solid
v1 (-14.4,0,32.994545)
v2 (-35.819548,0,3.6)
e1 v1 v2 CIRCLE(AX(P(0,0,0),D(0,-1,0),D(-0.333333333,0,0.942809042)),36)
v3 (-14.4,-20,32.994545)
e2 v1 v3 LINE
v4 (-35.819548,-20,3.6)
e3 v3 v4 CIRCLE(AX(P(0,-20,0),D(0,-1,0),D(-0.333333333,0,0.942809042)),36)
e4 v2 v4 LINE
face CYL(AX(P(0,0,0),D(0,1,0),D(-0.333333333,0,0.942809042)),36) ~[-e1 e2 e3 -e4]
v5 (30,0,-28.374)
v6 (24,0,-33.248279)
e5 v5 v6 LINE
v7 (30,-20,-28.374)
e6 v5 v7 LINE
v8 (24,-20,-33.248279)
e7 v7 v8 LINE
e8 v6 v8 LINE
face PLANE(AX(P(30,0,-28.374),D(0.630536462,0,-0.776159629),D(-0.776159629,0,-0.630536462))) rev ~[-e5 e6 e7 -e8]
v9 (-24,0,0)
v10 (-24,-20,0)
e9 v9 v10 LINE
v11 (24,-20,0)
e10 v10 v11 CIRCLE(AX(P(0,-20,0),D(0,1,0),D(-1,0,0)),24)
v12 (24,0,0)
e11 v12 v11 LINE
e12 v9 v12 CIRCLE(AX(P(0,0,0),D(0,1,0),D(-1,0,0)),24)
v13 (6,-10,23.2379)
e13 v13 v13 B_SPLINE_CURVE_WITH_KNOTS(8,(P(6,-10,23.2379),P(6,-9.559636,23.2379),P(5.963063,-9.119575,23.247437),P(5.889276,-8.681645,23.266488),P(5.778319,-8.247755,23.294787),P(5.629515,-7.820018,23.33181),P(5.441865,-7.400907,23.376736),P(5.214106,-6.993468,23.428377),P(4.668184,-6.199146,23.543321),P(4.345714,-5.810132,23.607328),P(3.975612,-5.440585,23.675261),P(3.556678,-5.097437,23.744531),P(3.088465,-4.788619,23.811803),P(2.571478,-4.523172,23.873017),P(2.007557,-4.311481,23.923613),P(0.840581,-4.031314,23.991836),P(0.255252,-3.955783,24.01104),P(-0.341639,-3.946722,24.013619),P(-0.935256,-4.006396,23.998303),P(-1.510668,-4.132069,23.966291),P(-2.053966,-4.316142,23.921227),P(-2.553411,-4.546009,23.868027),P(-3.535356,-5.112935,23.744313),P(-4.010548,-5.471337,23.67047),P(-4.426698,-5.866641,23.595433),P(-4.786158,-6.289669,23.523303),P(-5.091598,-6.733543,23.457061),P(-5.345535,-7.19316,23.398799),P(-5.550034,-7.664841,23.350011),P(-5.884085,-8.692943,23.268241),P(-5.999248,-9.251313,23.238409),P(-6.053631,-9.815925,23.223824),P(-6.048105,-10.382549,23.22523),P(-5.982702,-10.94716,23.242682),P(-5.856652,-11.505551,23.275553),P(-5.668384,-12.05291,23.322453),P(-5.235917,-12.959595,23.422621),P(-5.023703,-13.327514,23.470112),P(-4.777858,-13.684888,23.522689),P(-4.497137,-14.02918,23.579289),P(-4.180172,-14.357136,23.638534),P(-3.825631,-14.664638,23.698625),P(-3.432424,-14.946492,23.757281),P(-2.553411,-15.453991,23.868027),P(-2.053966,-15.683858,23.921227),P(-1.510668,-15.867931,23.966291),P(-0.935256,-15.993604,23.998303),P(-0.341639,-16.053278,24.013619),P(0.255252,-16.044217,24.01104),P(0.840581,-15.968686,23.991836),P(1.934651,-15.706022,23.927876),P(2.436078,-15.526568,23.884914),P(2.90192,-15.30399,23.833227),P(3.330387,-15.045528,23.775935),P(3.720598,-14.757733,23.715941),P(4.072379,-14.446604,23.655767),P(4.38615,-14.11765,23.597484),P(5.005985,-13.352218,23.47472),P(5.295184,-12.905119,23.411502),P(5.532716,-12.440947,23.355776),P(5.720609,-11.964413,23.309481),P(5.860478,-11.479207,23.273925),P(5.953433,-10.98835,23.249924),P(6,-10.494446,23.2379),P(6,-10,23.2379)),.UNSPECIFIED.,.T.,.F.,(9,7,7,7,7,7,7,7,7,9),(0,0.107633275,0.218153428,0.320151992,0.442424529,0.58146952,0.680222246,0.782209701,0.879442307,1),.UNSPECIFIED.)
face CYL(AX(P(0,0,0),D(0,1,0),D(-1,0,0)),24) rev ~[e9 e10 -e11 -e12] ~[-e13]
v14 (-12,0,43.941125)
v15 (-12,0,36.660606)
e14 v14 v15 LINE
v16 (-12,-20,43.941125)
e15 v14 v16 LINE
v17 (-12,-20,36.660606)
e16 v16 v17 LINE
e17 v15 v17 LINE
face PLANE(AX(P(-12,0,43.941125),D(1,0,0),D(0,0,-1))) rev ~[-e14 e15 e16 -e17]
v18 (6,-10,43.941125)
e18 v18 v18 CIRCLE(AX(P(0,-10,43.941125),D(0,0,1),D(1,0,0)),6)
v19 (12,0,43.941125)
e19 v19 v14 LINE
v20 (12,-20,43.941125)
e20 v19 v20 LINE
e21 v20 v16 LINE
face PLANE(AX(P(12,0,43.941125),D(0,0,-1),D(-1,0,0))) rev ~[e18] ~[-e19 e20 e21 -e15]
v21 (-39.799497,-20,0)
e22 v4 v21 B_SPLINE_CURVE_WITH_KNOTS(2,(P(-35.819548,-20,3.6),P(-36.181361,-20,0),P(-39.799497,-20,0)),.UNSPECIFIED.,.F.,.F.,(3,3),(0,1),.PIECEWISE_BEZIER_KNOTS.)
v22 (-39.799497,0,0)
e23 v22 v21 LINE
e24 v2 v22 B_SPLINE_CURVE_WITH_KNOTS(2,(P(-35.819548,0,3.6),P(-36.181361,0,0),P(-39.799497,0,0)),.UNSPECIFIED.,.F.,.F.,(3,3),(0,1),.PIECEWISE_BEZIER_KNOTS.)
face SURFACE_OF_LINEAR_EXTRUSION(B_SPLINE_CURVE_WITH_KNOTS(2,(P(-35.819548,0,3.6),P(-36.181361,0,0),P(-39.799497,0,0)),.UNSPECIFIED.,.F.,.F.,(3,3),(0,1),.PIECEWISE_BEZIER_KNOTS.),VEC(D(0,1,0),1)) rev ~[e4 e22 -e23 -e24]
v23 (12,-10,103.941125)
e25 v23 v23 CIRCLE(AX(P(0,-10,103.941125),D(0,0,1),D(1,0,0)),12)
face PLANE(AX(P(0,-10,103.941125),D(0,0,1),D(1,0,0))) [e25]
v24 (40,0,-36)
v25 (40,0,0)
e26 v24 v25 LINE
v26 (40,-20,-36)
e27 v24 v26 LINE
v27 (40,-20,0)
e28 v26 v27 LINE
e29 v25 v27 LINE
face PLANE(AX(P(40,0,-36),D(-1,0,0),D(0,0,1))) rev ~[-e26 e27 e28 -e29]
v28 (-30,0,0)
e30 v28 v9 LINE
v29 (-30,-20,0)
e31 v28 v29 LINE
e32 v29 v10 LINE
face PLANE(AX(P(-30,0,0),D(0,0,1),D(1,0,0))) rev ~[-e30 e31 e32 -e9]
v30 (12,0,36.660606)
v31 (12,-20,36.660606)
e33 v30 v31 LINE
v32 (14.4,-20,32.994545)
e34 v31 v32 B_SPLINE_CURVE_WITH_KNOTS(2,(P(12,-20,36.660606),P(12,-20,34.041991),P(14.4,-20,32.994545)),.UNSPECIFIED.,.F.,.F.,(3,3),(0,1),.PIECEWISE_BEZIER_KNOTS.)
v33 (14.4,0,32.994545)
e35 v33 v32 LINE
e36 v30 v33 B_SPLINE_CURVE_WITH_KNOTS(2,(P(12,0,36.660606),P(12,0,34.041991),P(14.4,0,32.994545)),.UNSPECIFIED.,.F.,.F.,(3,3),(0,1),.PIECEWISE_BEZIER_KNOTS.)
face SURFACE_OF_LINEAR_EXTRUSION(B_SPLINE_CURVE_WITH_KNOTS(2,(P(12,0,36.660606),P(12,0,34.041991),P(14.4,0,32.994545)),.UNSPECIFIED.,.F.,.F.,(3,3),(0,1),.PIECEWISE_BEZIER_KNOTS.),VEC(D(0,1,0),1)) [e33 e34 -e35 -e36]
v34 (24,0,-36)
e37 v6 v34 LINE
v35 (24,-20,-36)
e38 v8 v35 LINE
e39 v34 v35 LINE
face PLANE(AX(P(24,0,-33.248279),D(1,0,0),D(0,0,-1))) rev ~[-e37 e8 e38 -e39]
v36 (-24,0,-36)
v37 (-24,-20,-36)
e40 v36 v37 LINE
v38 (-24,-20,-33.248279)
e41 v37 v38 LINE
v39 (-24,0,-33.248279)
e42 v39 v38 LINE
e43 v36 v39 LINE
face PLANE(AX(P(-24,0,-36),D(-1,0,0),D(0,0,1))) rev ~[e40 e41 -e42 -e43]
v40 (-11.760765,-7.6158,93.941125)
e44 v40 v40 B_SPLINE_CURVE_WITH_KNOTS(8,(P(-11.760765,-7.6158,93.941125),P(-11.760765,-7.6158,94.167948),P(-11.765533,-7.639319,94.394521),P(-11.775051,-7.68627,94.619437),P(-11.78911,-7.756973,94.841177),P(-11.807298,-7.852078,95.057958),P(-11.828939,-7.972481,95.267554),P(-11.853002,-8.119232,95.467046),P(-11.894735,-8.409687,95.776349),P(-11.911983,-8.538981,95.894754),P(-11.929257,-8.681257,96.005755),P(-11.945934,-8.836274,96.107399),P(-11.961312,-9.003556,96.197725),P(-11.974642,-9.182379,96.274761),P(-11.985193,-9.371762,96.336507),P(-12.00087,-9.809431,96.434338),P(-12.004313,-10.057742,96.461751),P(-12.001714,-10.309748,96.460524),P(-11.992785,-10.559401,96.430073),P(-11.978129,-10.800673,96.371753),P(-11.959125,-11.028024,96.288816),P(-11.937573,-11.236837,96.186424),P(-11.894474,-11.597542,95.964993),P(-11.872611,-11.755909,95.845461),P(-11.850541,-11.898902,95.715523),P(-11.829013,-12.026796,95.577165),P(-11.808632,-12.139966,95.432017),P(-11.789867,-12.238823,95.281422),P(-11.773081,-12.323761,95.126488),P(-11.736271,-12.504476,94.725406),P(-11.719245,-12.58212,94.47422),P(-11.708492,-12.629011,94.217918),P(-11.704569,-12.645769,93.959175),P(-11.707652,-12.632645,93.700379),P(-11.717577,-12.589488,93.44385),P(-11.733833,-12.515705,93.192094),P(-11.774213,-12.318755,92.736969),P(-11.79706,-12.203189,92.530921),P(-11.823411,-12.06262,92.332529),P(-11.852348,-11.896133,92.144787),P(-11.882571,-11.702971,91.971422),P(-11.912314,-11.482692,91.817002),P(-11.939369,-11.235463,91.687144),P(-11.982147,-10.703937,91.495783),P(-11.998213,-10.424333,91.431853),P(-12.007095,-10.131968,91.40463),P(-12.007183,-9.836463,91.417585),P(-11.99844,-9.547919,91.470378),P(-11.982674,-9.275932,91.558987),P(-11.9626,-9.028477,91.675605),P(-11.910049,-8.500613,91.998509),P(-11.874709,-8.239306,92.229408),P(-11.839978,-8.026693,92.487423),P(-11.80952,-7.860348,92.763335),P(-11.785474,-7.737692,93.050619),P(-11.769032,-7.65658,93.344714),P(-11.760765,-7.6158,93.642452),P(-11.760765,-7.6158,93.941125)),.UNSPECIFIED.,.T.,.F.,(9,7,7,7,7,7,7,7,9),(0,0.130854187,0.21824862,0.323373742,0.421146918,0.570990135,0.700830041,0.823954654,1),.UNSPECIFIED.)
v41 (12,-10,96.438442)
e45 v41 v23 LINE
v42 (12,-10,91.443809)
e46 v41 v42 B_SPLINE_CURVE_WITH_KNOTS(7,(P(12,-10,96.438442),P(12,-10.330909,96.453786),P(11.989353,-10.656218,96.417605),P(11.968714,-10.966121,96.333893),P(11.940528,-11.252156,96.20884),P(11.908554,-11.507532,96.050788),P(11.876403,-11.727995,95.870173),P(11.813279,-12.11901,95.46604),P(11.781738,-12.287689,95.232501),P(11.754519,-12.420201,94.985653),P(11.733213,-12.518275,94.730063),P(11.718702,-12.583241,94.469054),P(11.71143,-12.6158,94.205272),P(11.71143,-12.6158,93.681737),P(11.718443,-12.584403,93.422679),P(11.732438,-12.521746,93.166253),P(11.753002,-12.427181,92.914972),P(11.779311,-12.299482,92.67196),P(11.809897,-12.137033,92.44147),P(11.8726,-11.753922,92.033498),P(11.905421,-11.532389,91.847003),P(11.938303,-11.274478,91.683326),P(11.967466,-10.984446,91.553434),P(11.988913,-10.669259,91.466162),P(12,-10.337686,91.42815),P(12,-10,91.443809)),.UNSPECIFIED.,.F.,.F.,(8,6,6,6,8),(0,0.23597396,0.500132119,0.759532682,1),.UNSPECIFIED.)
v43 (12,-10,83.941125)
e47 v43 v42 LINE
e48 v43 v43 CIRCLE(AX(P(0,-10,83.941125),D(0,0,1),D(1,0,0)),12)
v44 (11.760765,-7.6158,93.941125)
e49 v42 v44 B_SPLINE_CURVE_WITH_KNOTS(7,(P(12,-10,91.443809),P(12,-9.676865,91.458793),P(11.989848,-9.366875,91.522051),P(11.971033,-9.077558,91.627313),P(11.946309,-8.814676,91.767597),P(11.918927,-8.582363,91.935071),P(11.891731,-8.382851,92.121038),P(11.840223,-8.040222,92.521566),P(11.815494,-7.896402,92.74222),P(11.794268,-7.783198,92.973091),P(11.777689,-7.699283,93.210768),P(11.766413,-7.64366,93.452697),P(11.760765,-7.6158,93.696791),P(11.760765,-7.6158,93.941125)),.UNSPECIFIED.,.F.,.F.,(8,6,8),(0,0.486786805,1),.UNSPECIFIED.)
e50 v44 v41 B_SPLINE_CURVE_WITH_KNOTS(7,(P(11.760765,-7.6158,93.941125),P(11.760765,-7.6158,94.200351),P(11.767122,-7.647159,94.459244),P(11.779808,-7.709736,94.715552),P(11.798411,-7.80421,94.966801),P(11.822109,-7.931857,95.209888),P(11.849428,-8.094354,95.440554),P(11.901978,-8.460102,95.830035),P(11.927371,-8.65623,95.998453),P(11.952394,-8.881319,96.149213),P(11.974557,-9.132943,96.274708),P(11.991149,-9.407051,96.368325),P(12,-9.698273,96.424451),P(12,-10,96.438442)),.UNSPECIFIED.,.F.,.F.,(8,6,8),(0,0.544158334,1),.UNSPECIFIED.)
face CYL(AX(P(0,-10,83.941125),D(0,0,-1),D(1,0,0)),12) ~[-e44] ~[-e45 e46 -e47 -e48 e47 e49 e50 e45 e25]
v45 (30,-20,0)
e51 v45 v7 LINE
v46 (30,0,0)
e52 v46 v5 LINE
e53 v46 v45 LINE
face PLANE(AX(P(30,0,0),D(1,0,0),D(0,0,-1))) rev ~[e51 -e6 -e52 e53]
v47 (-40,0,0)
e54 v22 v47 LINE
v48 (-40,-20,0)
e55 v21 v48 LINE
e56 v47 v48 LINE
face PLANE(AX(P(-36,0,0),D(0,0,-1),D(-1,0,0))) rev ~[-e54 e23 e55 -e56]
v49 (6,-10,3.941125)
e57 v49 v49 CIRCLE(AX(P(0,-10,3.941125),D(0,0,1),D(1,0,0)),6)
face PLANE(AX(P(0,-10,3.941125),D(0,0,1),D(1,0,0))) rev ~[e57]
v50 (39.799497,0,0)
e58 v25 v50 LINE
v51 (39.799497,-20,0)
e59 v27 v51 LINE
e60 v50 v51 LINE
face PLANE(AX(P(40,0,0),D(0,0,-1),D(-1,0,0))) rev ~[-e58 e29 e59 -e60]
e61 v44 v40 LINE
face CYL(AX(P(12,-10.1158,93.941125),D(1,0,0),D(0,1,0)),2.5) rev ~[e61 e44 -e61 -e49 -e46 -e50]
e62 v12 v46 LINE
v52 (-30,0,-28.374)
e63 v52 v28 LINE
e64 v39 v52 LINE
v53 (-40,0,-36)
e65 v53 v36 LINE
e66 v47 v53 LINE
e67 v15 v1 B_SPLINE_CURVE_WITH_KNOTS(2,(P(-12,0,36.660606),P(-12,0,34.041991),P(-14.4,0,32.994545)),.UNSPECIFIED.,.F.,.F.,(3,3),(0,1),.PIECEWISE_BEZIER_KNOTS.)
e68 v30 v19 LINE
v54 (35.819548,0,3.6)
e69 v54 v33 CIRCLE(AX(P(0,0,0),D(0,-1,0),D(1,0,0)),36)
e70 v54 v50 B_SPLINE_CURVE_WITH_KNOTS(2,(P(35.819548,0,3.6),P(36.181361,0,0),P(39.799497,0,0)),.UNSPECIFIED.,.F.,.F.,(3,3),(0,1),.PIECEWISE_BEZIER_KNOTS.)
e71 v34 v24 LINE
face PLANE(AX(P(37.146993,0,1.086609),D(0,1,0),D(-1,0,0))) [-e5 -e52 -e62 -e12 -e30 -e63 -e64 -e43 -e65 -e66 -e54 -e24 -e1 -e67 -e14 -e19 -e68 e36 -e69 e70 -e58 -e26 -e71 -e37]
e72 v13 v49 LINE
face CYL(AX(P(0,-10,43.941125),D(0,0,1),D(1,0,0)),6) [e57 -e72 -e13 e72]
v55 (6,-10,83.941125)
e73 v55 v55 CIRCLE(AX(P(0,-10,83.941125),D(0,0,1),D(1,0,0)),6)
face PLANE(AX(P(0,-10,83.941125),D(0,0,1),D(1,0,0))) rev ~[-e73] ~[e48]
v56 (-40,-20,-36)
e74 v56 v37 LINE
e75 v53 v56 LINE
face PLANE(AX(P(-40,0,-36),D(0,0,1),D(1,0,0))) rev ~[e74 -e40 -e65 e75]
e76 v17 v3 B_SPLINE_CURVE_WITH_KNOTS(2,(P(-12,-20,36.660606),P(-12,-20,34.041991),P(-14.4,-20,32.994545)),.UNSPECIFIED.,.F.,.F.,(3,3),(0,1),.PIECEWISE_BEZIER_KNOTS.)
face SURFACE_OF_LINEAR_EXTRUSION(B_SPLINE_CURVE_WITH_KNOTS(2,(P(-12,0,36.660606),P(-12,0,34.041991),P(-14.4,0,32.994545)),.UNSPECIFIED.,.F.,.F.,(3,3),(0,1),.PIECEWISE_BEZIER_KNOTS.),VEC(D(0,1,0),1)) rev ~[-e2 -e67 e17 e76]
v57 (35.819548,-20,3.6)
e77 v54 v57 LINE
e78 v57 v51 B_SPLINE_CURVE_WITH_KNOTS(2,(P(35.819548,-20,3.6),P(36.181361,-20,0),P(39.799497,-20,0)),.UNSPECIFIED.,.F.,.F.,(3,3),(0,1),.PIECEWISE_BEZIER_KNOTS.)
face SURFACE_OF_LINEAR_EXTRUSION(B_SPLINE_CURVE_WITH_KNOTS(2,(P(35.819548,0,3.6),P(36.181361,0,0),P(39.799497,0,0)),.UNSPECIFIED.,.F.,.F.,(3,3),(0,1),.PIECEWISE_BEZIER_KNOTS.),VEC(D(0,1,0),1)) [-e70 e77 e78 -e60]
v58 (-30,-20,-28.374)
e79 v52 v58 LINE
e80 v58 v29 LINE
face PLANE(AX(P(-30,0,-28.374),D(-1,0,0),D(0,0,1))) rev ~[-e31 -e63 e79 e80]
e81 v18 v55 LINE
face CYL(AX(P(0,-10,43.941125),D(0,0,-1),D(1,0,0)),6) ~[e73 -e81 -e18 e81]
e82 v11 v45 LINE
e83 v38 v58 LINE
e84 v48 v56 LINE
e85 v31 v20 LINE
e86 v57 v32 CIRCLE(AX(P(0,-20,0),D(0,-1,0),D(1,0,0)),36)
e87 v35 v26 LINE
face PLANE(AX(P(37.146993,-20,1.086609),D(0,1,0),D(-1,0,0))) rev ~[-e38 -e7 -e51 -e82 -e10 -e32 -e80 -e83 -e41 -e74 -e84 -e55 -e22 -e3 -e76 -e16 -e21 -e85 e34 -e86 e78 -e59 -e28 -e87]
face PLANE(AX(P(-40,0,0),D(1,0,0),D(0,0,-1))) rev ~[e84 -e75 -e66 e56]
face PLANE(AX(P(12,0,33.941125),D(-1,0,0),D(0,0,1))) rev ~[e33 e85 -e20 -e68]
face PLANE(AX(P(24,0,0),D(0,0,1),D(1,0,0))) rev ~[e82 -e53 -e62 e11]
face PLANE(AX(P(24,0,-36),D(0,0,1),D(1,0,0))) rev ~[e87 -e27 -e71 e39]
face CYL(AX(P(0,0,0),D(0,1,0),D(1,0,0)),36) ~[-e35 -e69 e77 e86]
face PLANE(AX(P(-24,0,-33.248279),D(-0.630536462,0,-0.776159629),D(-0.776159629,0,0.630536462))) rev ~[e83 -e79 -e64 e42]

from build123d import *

# Parameters (mm, degrees)
F1_DEPTH      = 20
F2_R          = 6
F3_DEPTH      = 40
F3_DEPTH_BACK = 40
F4_R          = 12
F5_DEPTH      = 20
F7_R          = 2.5
F8_DEPTH      = 25
F9_T1_DEPTH   = 20


# Not quite as in the source:
# - a fillet or chamfer that OpenCascade refuses, or shapes differently, is made with other operations: its cross-section is extruded or revolved along the edge and cut away or added
# - a feature names something its author has since deleted; it is built from what else it names


with BuildPart() as f1:
    # F0 (on Front) → F1 (new body)
    with BuildSketch(Plane.XZ):
        with BuildLine():
            ThreePointArc((-12, 33.941125497), (-29.3938769134, 20.7846096908), (-36, 0))
            Line((-36, 0), (-30, 0))
            Line((-30, 0), (-24, 0))
            ThreePointArc((-24, 0), (0, 24), (24, 0))
            Line((24, 0), (30, 0))
            Line((30, 0), (36, 0))
            ThreePointArc((36, 0), (29.3938769134, 20.7846096908), (12, 33.941125497))
            Line((12, 33.941125497), (12, 43.941125497))
            Line((12, 43.941125497), (-12, 43.941125497))
            Line((-12, 43.941125497), (-12, 33.941125497))
        make_face()
        Polygon((-30, 0), (-36, 0), (-40, 0), (-40, -28.374), (-40, -36), (-24, -36), (-24, -33.2482792437), (-30, -28.374), align=None)
        Polygon((36, 0), (30, 0), (30, -28.374), (24, -33.2482792437), (24, -36), (40, -36), (40, -28.374), (40, 0), align=None)
    extrude(amount=F1_DEPTH)

    # F2 (on face) → F3 (join, two sides)
    with BuildSketch(Plane.XY.offset(43.941125497)) as f3_sk:
        with Locations((0, -10)):
            Circle(F2_R)
    extrude(amount=F3_DEPTH)
    extrude(f3_sk.sketch, amount=-F3_DEPTH_BACK)

    # F4 (on face) → F5 (join)
    with BuildSketch(Plane.XY.offset(83.941125497)):
        with Locations((0, -10)):
            Circle(F4_R)
    extrude(amount=F5_DEPTH)

    # F7 (on offset) → F8 (cut)
    with BuildSketch(Plane.YZ.offset(12)):
        with Locations((-10.1158004254, 93.941125497)):
            Circle(F7_R)
    extrude(amount=-F8_DEPTH, mode=Mode.SUBTRACT)

    # F9: fillet of radius 4 on 4 edges, made by hand

    # F9_s2 → F9_t1 (join)
    with BuildSketch(Plane.XZ):
        with BuildLine():
            add(Edge.make_bspline(
                [(35.8195477358, 3.6), (36.1813613493, 0), (39.7994974843, 0)],
                knots=[0, 0, 0, 1, 1, 1], degree=2, weights=[1, 1, 1]))
            Line((39.7994974843, 0), (36, 0))
            ThreePointArc((36, 0), (35.954858632, 1.8022599022), (35.8195477358, 3.6))
        make_face()
        with BuildLine():
            add(Edge.make_bspline(
                [(-35.8195477358, 3.6), (-36.1813613493, 0), (-39.7994974843, 0)],
                knots=[0, 0, 0, 1, 1, 1], degree=2, weights=[1, 1, 1]))
            Line((-39.7994974843, 0), (-36, 0))
            ThreePointArc((-36, 0), (-35.954858632, 1.8022599022), (-35.8195477358, 3.6))
        make_face()
        with BuildLine():
            add(Edge.make_bspline(
                [(-12, 36.6606055596), (-12, 34.0419908768), (-14.4, 32.9945450037)],
                knots=[0, 0, 0, 1, 1, 1], degree=2, weights=[1, 1, 1]))
            ThreePointArc((-14.4, 32.9945450037), (-13.2084822617, 33.4893415334), (-12, 33.941125497))
            Line((-12, 33.941125497), (-12, 36.6606055596))
        make_face()
        with BuildLine():
            add(Edge.make_bspline(
                [(12, 36.6606055596), (12, 34.0419908768), (14.4, 32.9945450037)],
                knots=[0, 0, 0, 1, 1, 1], degree=2, weights=[1, 1, 1]))
            ThreePointArc((14.4, 32.9945450037), (13.2084822617, 33.4893415334), (12, 33.941125497))
            Line((12, 33.941125497), (12, 36.6606055596))
        make_face()
    extrude(amount=F9_T1_DEPTH)


solid = f1.part
